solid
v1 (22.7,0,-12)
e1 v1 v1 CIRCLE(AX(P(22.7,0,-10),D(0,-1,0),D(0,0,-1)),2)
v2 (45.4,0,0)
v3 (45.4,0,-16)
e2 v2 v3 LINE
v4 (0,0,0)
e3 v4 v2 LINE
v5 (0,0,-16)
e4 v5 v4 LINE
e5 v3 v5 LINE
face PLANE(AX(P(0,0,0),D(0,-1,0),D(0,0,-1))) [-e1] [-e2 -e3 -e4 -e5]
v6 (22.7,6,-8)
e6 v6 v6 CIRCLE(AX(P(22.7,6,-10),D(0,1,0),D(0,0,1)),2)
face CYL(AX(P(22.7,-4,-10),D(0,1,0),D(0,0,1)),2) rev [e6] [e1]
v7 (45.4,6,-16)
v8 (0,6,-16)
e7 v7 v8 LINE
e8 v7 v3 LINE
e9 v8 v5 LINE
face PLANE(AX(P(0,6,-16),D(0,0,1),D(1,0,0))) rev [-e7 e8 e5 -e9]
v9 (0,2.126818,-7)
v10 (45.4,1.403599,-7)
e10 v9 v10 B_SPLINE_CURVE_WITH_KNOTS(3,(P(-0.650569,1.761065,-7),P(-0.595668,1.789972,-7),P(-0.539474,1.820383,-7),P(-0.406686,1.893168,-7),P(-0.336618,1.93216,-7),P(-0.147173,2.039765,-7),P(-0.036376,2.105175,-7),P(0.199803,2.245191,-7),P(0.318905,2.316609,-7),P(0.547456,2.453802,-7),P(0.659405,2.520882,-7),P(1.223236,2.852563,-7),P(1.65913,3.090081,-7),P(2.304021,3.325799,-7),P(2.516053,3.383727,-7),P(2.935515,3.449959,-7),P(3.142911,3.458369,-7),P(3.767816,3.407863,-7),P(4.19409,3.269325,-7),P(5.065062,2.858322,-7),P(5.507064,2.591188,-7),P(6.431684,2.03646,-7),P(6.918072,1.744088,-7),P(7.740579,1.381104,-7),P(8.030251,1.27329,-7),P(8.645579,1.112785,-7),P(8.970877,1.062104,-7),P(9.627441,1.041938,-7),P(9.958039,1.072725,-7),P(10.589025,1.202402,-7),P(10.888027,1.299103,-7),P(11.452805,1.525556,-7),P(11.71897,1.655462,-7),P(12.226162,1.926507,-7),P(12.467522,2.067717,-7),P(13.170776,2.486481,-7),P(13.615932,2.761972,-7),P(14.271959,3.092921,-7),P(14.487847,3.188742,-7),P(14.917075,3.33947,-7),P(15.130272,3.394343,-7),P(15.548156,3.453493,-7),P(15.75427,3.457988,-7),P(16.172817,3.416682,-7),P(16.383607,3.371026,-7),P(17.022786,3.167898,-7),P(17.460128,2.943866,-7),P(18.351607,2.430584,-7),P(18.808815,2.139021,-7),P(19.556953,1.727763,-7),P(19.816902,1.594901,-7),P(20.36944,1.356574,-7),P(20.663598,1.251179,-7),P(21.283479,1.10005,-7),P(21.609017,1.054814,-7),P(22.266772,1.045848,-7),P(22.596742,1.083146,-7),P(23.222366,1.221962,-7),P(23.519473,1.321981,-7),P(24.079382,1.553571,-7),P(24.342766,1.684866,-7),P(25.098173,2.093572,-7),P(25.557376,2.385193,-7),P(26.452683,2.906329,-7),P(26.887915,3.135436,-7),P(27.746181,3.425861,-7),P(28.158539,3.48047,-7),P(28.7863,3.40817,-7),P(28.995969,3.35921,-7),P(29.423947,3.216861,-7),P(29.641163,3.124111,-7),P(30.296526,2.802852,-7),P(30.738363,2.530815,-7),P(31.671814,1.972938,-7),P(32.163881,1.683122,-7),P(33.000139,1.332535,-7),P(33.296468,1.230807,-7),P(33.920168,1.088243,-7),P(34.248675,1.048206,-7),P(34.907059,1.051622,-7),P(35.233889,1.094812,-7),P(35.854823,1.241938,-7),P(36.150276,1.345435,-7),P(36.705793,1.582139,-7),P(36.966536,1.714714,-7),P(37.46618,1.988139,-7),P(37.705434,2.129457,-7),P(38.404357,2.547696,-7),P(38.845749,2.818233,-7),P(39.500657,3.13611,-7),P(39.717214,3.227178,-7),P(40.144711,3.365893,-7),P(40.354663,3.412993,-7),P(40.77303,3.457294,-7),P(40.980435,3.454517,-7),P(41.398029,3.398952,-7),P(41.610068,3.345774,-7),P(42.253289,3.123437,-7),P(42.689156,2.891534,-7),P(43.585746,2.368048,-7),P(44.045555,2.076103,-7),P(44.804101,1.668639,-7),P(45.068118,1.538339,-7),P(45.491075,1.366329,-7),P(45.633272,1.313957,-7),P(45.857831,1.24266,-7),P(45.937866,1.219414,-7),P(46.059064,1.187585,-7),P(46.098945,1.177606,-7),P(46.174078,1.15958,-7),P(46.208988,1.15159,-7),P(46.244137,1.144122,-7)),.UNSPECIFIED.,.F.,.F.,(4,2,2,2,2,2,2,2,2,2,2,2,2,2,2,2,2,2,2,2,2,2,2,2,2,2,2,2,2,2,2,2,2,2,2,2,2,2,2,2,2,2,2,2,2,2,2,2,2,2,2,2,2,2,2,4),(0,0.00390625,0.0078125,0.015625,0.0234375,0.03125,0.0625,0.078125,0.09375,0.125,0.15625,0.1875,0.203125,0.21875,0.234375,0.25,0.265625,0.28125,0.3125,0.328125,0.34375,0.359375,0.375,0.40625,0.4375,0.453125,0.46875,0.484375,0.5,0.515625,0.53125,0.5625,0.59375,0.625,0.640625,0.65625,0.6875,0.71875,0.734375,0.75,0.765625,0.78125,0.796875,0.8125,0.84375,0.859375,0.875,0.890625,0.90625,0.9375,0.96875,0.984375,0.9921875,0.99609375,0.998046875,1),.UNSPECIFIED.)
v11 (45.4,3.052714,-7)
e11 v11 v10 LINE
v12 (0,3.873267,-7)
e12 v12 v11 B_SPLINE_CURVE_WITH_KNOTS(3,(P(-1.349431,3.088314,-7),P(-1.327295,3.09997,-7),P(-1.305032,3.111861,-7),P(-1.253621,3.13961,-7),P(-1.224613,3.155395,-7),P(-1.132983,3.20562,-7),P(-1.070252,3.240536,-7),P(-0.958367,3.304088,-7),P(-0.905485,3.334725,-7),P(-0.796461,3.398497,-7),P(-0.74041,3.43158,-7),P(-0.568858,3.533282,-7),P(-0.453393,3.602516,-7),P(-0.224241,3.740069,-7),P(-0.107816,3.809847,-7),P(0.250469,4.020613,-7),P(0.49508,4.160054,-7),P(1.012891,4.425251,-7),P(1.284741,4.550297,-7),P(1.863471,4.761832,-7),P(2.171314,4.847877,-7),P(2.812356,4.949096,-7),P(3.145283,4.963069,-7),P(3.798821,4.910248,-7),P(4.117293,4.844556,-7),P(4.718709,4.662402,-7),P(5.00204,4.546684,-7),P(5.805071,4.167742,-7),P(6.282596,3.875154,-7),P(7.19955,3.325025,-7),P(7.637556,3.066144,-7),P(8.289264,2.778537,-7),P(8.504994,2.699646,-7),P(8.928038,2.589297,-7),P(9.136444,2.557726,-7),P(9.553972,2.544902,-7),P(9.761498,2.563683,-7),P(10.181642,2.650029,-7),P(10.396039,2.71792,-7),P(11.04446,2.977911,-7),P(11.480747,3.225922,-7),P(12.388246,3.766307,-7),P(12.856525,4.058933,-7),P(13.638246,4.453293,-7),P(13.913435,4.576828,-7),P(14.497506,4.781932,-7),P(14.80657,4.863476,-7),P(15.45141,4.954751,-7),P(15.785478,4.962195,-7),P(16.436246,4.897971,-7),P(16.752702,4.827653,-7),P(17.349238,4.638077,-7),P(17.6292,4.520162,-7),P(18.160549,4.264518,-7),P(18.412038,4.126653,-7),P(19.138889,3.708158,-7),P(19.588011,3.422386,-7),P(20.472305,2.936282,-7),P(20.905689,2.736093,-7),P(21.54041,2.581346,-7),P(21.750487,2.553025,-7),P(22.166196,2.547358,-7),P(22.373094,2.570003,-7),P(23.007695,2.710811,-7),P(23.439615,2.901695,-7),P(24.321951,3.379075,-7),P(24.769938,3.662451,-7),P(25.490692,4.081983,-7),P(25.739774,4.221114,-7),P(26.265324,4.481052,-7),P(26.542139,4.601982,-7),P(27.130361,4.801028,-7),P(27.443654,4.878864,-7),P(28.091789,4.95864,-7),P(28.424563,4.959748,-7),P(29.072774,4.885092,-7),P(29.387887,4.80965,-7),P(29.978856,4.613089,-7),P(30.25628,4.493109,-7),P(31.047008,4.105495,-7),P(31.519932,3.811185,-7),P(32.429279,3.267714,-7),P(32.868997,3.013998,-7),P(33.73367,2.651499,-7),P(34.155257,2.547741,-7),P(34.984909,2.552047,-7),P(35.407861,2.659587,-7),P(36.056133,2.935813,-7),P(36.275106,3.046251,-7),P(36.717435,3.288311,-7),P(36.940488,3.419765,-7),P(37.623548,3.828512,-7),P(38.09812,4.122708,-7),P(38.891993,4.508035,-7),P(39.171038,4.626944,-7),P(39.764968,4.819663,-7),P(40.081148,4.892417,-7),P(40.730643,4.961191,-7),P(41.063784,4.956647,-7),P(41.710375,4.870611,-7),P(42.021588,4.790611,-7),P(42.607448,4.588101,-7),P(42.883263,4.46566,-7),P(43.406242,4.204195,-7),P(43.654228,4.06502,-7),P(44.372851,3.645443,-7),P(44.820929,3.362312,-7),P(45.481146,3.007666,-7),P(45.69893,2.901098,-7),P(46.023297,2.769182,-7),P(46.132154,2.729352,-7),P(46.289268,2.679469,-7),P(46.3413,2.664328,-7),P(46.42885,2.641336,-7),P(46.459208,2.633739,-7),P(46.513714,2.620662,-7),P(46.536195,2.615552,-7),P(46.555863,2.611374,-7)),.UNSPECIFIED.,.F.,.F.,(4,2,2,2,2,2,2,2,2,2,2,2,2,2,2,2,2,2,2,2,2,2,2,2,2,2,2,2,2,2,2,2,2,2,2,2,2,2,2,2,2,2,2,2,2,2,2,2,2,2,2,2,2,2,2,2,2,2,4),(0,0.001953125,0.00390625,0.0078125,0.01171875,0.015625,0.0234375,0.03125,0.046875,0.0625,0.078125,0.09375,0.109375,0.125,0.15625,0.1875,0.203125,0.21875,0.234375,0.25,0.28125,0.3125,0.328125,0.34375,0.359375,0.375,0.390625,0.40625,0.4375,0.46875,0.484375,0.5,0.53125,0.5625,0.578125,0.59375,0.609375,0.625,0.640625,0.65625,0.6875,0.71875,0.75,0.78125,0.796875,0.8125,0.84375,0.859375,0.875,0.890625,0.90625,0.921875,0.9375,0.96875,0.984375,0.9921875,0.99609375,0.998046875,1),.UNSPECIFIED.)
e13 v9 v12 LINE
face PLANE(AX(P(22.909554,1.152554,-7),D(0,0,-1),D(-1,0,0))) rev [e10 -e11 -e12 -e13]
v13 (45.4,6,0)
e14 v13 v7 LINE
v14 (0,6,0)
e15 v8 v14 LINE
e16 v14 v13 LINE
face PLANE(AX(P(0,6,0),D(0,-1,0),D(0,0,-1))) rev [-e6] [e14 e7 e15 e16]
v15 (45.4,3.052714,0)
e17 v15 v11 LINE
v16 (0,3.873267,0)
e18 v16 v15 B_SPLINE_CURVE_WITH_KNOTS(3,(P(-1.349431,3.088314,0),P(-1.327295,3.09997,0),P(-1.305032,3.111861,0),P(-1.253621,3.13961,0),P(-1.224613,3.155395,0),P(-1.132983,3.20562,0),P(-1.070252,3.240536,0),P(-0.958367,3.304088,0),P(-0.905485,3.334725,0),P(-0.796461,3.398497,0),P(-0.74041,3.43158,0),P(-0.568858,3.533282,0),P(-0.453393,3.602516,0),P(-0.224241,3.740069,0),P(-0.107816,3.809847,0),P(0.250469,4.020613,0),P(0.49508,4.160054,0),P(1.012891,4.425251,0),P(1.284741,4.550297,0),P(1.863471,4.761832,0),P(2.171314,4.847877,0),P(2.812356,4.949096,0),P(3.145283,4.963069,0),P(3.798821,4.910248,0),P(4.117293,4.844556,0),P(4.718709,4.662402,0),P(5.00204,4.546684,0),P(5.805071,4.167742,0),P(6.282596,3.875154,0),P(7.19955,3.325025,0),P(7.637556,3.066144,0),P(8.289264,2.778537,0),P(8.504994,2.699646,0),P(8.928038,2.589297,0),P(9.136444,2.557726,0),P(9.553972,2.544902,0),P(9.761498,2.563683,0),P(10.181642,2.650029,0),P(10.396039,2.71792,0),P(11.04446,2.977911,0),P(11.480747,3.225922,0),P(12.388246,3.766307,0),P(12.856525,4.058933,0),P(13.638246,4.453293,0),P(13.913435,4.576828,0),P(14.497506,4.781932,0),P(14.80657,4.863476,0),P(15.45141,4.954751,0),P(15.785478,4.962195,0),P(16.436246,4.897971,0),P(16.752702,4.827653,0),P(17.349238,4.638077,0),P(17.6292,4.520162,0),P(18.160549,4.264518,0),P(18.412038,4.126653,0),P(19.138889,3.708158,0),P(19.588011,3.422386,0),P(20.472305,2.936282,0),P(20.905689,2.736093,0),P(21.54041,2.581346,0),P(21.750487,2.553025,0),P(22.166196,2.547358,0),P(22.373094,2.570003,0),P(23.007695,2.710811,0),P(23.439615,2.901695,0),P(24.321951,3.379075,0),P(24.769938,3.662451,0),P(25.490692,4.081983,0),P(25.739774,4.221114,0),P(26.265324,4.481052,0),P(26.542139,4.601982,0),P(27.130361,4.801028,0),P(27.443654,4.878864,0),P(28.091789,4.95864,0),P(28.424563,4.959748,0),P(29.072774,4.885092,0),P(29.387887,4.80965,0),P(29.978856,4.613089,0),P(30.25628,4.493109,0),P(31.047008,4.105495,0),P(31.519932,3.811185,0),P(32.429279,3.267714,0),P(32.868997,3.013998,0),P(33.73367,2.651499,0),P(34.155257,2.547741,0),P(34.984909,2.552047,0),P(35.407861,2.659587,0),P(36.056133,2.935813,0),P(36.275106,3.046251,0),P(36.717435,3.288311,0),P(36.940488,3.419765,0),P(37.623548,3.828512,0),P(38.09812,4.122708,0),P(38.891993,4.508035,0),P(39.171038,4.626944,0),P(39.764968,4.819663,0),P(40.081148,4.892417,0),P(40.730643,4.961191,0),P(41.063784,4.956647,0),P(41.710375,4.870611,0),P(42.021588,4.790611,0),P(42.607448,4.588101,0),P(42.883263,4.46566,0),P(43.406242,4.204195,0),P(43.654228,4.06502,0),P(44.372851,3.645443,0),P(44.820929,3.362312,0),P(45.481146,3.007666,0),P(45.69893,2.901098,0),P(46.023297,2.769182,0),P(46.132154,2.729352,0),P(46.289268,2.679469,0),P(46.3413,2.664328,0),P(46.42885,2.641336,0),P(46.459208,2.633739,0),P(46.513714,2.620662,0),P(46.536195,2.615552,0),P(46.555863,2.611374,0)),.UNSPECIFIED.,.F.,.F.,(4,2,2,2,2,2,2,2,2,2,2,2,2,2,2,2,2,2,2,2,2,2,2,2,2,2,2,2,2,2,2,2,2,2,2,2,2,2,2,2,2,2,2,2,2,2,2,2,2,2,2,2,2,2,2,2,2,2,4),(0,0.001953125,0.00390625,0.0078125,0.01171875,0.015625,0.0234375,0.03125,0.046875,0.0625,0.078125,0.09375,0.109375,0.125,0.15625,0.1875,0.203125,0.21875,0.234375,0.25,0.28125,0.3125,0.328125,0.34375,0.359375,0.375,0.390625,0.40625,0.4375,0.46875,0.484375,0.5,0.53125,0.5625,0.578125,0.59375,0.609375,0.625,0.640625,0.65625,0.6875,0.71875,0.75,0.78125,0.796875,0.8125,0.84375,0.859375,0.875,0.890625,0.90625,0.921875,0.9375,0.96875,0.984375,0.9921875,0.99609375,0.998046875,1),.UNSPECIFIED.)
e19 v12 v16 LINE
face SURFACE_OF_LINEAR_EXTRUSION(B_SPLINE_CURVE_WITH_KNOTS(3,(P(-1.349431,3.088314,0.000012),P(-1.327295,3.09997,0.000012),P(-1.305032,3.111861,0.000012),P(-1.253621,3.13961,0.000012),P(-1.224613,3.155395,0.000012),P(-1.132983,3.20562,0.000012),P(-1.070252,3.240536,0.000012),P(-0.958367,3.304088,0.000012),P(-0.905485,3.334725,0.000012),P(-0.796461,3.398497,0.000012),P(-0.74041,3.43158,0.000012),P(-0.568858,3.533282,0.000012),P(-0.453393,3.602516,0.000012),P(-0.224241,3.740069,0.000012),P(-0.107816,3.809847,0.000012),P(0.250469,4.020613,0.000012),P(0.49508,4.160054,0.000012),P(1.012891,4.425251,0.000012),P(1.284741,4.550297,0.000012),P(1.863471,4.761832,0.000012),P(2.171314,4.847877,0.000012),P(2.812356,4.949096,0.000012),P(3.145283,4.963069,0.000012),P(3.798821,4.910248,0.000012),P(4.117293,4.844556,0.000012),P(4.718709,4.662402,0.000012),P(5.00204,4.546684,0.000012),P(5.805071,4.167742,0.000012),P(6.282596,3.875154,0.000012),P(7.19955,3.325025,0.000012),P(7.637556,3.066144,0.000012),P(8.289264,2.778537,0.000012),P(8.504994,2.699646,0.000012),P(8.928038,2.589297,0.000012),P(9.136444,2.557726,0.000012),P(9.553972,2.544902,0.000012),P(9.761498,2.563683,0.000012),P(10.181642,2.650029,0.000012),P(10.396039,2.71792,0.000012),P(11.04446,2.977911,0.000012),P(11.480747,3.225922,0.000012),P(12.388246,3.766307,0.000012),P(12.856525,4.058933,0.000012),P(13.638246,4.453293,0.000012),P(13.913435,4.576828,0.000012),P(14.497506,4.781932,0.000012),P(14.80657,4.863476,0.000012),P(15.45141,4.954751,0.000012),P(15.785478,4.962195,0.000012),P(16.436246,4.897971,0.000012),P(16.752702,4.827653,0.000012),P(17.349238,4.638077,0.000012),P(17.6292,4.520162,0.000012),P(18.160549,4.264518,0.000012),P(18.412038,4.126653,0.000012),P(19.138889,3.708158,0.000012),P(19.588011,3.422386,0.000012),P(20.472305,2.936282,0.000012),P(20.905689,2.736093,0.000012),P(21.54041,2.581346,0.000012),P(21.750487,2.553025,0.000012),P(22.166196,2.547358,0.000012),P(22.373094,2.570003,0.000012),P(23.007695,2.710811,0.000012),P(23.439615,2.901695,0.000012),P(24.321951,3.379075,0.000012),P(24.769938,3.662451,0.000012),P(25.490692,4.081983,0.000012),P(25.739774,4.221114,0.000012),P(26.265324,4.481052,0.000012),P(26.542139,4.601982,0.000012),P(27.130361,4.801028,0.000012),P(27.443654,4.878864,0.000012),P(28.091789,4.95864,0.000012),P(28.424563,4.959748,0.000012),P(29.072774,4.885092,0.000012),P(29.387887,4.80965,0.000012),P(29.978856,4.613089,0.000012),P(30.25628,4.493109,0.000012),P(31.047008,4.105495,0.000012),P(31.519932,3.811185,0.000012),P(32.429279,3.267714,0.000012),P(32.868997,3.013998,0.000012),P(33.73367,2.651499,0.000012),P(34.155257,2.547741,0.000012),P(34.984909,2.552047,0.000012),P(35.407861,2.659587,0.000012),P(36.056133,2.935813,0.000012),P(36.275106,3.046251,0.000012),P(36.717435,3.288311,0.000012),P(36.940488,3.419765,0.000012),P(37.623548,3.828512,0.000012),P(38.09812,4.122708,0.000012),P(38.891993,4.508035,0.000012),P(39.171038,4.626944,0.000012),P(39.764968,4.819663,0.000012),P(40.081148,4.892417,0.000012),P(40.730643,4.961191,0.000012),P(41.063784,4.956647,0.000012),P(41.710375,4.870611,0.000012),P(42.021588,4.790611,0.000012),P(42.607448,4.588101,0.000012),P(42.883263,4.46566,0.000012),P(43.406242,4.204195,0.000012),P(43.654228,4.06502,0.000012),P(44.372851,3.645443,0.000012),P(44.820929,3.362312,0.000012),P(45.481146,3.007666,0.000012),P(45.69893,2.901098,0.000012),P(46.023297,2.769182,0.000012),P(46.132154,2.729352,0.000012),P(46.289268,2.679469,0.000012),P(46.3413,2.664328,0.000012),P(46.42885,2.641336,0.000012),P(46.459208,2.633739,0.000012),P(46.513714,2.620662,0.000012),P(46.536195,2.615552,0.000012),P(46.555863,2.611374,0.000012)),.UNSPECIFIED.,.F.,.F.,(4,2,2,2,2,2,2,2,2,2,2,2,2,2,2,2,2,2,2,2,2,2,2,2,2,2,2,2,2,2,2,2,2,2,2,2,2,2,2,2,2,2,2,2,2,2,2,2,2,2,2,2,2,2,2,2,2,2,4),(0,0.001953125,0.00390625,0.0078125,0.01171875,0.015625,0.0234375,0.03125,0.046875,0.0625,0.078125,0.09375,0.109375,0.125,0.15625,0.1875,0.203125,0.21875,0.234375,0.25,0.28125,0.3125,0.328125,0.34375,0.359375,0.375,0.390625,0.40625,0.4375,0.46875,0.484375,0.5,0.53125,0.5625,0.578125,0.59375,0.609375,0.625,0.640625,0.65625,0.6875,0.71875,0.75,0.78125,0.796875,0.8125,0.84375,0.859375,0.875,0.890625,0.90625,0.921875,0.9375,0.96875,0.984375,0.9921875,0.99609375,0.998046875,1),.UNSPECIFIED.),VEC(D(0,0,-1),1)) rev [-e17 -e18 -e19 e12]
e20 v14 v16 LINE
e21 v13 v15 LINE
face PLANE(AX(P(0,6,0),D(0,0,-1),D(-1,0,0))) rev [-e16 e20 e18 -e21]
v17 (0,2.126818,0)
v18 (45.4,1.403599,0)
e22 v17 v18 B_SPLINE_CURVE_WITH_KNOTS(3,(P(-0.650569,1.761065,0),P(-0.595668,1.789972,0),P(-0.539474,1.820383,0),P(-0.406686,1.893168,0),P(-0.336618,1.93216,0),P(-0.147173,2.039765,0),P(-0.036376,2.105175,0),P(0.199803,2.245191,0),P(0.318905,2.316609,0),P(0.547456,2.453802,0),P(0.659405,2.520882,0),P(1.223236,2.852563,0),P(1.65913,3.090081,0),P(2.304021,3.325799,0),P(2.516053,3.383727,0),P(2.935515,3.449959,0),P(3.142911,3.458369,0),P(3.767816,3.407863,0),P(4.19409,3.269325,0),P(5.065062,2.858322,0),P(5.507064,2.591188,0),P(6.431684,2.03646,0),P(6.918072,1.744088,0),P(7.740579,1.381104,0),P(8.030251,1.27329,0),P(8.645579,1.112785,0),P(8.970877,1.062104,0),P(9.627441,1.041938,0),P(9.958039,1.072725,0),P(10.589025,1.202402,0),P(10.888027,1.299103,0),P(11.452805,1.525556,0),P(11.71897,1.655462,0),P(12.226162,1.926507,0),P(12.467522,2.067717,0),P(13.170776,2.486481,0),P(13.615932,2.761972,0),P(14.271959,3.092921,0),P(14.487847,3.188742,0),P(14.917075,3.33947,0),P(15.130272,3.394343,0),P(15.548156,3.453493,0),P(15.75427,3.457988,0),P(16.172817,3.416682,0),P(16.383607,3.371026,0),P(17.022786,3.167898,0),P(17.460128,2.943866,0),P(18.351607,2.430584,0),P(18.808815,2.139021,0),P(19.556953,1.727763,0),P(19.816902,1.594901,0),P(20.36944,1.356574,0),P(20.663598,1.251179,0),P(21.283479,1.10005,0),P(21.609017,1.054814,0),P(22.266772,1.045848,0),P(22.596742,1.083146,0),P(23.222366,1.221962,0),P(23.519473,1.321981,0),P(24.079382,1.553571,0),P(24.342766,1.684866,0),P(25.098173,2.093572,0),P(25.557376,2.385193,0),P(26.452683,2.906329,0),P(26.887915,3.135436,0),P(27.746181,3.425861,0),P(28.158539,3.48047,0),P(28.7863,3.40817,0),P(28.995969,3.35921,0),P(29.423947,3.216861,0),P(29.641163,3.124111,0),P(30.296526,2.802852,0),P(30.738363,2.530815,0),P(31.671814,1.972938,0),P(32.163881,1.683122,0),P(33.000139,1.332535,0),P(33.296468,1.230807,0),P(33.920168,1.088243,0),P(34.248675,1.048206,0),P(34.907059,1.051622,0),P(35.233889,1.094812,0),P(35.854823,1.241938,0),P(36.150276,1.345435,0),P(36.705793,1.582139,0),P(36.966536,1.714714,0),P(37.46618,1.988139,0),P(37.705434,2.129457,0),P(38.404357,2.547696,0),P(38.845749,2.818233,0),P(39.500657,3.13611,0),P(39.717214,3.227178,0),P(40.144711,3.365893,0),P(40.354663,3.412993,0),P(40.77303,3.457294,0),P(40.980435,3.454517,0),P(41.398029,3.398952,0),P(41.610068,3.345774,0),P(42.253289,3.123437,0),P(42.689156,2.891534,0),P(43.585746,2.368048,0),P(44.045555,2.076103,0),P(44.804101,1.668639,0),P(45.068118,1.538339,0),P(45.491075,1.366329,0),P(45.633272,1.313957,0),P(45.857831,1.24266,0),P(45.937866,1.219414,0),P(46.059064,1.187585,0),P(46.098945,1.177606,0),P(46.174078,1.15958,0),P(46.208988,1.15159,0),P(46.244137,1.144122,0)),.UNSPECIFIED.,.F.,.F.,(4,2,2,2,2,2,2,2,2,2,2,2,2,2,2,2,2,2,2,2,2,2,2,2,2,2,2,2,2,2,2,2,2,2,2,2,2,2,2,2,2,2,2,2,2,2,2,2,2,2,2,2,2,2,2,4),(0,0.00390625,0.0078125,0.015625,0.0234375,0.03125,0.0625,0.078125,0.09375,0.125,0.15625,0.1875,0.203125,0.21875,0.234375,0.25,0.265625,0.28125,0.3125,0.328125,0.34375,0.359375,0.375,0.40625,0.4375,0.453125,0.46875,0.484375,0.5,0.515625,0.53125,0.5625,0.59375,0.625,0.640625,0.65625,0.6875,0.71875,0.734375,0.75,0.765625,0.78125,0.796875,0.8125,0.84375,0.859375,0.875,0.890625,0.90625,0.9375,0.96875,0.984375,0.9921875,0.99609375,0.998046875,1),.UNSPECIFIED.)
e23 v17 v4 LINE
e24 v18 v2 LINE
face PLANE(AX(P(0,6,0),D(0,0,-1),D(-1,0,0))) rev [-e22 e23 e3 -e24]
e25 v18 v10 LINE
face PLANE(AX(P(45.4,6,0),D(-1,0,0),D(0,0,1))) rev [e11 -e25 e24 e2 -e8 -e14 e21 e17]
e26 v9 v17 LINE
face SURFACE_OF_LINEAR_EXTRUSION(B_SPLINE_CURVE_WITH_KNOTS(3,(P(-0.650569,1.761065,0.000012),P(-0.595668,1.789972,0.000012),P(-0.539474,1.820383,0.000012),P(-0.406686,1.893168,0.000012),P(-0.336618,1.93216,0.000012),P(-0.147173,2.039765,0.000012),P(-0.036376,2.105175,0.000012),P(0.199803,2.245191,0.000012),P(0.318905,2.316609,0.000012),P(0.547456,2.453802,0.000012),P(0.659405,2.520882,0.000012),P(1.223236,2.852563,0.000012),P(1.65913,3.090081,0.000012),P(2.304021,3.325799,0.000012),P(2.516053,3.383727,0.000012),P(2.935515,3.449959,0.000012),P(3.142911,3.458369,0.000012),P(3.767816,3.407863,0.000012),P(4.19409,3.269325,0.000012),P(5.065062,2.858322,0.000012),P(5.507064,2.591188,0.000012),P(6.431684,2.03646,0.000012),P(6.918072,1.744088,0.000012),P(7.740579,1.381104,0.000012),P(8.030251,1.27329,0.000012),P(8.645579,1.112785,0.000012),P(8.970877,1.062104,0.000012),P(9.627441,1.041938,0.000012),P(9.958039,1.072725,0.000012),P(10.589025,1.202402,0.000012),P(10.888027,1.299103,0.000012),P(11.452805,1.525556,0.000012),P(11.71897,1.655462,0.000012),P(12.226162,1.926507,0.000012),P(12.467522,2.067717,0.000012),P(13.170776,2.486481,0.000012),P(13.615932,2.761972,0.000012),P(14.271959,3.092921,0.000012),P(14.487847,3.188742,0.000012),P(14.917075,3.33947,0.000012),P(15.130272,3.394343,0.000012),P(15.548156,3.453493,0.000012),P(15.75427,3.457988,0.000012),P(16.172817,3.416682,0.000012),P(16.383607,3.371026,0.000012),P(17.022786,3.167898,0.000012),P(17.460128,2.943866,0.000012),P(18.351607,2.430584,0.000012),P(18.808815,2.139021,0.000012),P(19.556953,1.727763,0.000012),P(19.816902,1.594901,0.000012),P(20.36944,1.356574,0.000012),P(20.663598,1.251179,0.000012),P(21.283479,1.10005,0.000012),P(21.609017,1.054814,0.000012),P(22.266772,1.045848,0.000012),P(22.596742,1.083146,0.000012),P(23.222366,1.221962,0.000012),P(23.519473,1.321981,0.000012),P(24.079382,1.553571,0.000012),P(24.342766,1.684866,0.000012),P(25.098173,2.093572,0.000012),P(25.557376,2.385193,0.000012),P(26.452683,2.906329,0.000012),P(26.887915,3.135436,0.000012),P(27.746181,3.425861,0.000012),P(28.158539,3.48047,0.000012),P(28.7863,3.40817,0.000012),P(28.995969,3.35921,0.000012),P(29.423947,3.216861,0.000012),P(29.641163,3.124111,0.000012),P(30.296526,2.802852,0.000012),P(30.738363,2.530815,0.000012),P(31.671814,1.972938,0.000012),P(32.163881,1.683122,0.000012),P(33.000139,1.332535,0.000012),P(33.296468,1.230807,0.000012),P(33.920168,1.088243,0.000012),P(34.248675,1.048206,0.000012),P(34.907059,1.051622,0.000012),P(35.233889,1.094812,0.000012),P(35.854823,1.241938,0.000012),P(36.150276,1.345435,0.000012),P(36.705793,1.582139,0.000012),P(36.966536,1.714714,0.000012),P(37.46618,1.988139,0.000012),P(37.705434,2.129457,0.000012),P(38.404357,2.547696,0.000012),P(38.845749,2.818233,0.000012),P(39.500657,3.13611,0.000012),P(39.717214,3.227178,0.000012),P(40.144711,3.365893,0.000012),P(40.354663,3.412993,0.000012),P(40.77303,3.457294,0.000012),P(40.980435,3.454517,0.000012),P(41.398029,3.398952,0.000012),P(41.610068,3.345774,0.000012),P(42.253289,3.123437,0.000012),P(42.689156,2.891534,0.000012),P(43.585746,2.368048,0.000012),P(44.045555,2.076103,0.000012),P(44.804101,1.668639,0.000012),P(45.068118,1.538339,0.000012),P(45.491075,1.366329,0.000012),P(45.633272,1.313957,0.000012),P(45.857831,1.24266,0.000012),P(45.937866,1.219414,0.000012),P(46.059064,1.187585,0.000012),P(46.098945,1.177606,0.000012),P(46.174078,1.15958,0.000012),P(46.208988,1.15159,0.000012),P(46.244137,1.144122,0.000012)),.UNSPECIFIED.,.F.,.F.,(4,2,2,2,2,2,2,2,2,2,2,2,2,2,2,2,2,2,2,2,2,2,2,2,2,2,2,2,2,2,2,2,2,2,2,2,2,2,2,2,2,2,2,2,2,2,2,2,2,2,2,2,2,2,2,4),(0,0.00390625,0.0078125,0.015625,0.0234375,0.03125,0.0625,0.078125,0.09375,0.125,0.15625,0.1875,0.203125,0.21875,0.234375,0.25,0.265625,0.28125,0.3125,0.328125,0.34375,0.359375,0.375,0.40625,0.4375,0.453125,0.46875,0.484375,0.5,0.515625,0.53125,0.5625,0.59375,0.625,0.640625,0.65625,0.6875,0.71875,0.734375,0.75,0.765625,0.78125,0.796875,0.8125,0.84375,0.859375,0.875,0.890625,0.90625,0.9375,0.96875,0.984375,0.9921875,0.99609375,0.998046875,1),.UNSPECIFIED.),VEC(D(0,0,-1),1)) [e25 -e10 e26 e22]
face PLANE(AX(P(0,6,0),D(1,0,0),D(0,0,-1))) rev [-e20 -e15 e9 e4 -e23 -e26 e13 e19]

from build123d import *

# Parameters (mm, degrees)
SKETCH1_W               = 45.4
SKETCH1_H               = 16
BOSS_EXTRUDE1_DEPTH     = 6
CUT_EXTRUDE_THIN1_START = -7
CUT_EXTRUDE_THIN1_DEPTH = 7
SKETCH3_R               = 2
CUT_EXTRUDE4_DEPTH      = 10


# Read off the part's stored shape, not the designer's step: Cut-Extrude-Thin1
with BuildPart() as part:
    # Sketch1 → Boss-Extrude1 (new body)
    with BuildSketch(Plane(origin=(0, 0, 0), x_dir=(1, 0, 0), z_dir=(0, 1, 0))):
        with Locations((22.7, 8)):
            Rectangle(SKETCH1_W, SKETCH1_H)
    extrude(amount=BOSS_EXTRUDE1_DEPTH)

    # Cut-Extrude-Thin1 outline → Cut-Extrude-Thin1 (cut)
    with BuildSketch(Plane.XY.offset(CUT_EXTRUDE_THIN1_START)):
        with BuildLine():
            Line((0, 3.873267445), (0, 2.126817741))
            add(Edge.make_bspline(
                [(0, 2.126817741), (0.02703382, 2.142781723), (0.054175194, 2.15885723), (0.199802786, 2.245191001), (0.318904635, 2.316609427), (0.547456156, 2.453801634), (0.659404505, 2.520881504), (1.223235747, 2.852563391), (1.659129881, 3.090081368), (2.304021331, 3.325798968), (2.516053427, 3.383726921), (2.935514936, 3.449959162), (3.142910642, 3.458369463), (3.767815623, 3.407863189), (4.19408996, 3.269324885), (5.065062464, 2.858321616), (5.50706417, 2.591187682), (6.431683782, 2.036459554), (6.918071796, 1.744087969), (7.740579172, 1.381104099), (8.030251466, 1.273290225), (8.645579036, 1.112784531), (8.970876862, 1.062103691), (9.62744136, 1.04193798), (9.958039149, 1.072725046), (10.589024972, 1.202402245), (10.888026805, 1.299103066), (11.452805261, 1.525556109), (11.718970495, 1.655461765), (12.226161625, 1.926507336), (12.467522401, 2.067716558), (13.170775959, 2.486480844), (13.615931783, 2.76197178), (14.271958768, 3.092921072), (14.487846746, 3.188741776), (14.917075207, 3.339470443), (15.130272064, 3.394343156), (15.548156295, 3.45349324), (15.75427037, 3.457987949), (16.172816849, 3.416681909), (16.383607329, 3.371026255), (17.022785721, 3.167898464), (17.460128234, 2.943866168), (18.351607435, 2.430583519), (18.80881458, 2.139021166), (19.556952632, 1.727762653), (19.816902465, 1.594900544), (20.369439987, 1.356573587), (20.663597747, 1.251179423), (21.283479066, 1.10005025), (21.609016745, 1.054814487), (22.266771634, 1.045847552), (22.596742032, 1.083145554), (23.222365778, 1.221962497), (23.519472543, 1.321980696), (24.079382347, 1.553570863), (24.342766312, 1.684865845), (25.098173394, 2.093571519), (25.557376229, 2.385193139), (26.452683258, 2.906328822), (26.887914853, 3.135436001), (27.746180841, 3.425860973), (28.158539125, 3.480470405), (28.786299796, 3.408170386), (28.995968884, 3.359210465), (29.423947166, 3.216861002), (29.641162564, 3.124110993), (30.296525986, 2.802852497), (30.738363236, 2.530814809), (31.671813969, 1.97293848), (32.163881244, 1.683121755), (33.000138587, 1.332534814), (33.296467876, 1.230806571), (33.92016789, 1.088242868), (34.248675292, 1.048205652), (34.907059265, 1.051622384), (35.233888776, 1.094812192), (35.854823483, 1.241938496), (36.150275582, 1.345434697), (36.705793014, 1.582138569), (36.966535771, 1.714713739), (37.46618007, 1.988138513), (37.705434355, 2.129457341), (38.404356673, 2.547696158), (38.845749072, 2.818233186), (39.500657349, 3.136109655), (39.717214125, 3.227177696), (40.144711185, 3.365892553), (40.354662828, 3.412992927), (40.773030437, 3.457293529), (40.980435207, 3.454517198), (41.398028958, 3.398951825), (41.610067714, 3.345773528), (42.253288523, 3.123436571), (42.689155986, 2.891534001), (43.585746337, 2.368048308), (44.045555086, 2.076103322), (44.804100753, 1.668638949), (45.068118248, 1.538339158), (45.366705882, 1.416907758), (45.383339369, 1.410218973), (45.4, 1.403598957)],
                knots=[0.01380316, 0.01380316, 0.01380316, 0.01380316, 0.015625, 0.015625, 0.0234375, 0.0234375, 0.03125, 0.03125, 0.0625, 0.0625, 0.078125, 0.078125, 0.09375, 0.09375, 0.125, 0.125, 0.15625, 0.15625, 0.1875, 0.1875, 0.203125, 0.203125, 0.21875, 0.21875, 0.234375, 0.234375, 0.25, 0.25, 0.265625, 0.265625, 0.28125, 0.28125, 0.3125, 0.3125, 0.328125, 0.328125, 0.34375, 0.34375, 0.359375, 0.359375, 0.375, 0.375, 0.40625, 0.40625, 0.4375, 0.4375, 0.453125, 0.453125, 0.46875, 0.46875, 0.484375, 0.484375, 0.5, 0.5, 0.515625, 0.515625, 0.53125, 0.53125, 0.5625, 0.5625, 0.59375, 0.59375, 0.625, 0.625, 0.640625, 0.640625, 0.65625, 0.65625, 0.6875, 0.6875, 0.71875, 0.71875, 0.734375, 0.734375, 0.75, 0.75, 0.765625, 0.765625, 0.78125, 0.78125, 0.796875, 0.796875, 0.8125, 0.8125, 0.84375, 0.84375, 0.859375, 0.859375, 0.875, 0.875, 0.890625, 0.890625, 0.90625, 0.90625, 0.9375, 0.9375, 0.96875, 0.96875, 0.984375, 0.984375, 0.985295787, 0.985295787, 0.985295787, 0.985295787], degree=3))
            Line((45.4, 1.403598957), (45.400000004, 3.052714))
            add(Edge.make_bspline(
                [(0, 3.873267445), (0.003867713, 3.875545356), (0.007738546, 3.877823787), (0.250469006, 4.020613492), (0.495079597, 4.160053663), (1.012890651, 4.425250629), (1.284740564, 4.550297134), (1.86347111, 4.76183192), (2.171314028, 4.847876947), (2.81235644, 4.949096426), (3.145282675, 4.963068961), (3.798820837, 4.910248487), (4.117293225, 4.844555634), (4.718708859, 4.662401706), (5.002040385, 4.546684188), (5.805070872, 4.167742082), (6.282596051, 3.875154302), (7.19954989, 3.325025275), (7.637556428, 3.066144173), (8.289263977, 2.778536627), (8.504994239, 2.69964625), (8.928037725, 2.589297078), (9.136444307, 2.5577258), (9.553972433, 2.544901849), (9.761498066, 2.56368264), (10.181642273, 2.650028675), (10.396038802, 2.717920292), (11.044459748, 2.97791055), (11.480747342, 3.225921565), (12.388245941, 3.766307033), (12.856524649, 4.058933488), (13.638246286, 4.453292605), (13.913435199, 4.576828438), (14.497506198, 4.7819319), (14.80657005, 4.863476297), (15.451409614, 4.954751133), (15.785477854, 4.962195082), (16.436245788, 4.89797128), (16.752702226, 4.827653432), (17.349238381, 4.638077136), (17.629199854, 4.520162486), (18.160549165, 4.264517545), (18.412038425, 4.126652649), (19.138888817, 3.708157529), (19.588011382, 3.422386166), (20.472304829, 2.936281753), (20.905689258, 2.736093288), (21.540410043, 2.581346203), (21.750486993, 2.553025254), (22.166195505, 2.54735805), (22.37309431, 2.570002638), (23.007695036, 2.710811445), (23.43961466, 2.901695121), (24.321951208, 3.379074751), (24.769938492, 3.662450532), (25.49069199, 4.081982999), (25.739774147, 4.221113848), (26.265324427, 4.481051988), (26.542139405, 4.601982239), (27.130361027, 4.801028048), (27.443653593, 4.878863839), (28.09178915, 4.958640067), (28.424563097, 4.959747626), (29.072774338, 4.885092288), (29.387887281, 4.80965047), (29.978856326, 4.6130888), (30.256280206, 4.493108966), (31.047007705, 4.105495135), (31.519931981, 3.811184839), (32.42927946, 3.267713808), (32.86899683, 3.013998451), (33.733669543, 2.651498841), (34.155257129, 2.54774105), (34.984908919, 2.552046589), (35.407860618, 2.659586891), (36.056133151, 2.93581336), (36.27510638, 3.046251422), (36.71743538, 3.288311037), (36.940487753, 3.419765313), (37.623548397, 3.828512419), (38.098120254, 4.122708489), (38.891992645, 4.508034742), (39.171037756, 4.62694392), (39.764967834, 4.8196632), (40.081148481, 4.892416665), (40.730643342, 4.961191141), (41.063783913, 4.956647377), (41.710375198, 4.870611401), (42.021587579, 4.790610545), (42.607447829, 4.58810095), (42.883262745, 4.465659864), (43.406242203, 4.204194984), (43.654228228, 4.065020041), (44.372851449, 3.645442724), (44.820928505, 3.362312101), (45.307481866, 3.100952543), (45.353788309, 3.07654159), (45.400000004, 3.052714)],
                knots=[0.030996579, 0.030996579, 0.030996579, 0.030996579, 0.03125, 0.03125, 0.046875, 0.046875, 0.0625, 0.0625, 0.078125, 0.078125, 0.09375, 0.09375, 0.109375, 0.109375, 0.125, 0.125, 0.15625, 0.15625, 0.1875, 0.1875, 0.203125, 0.203125, 0.21875, 0.21875, 0.234375, 0.234375, 0.25, 0.25, 0.28125, 0.28125, 0.3125, 0.3125, 0.328125, 0.328125, 0.34375, 0.34375, 0.359375, 0.359375, 0.375, 0.375, 0.390625, 0.390625, 0.40625, 0.40625, 0.4375, 0.4375, 0.46875, 0.46875, 0.484375, 0.484375, 0.5, 0.5, 0.53125, 0.53125, 0.5625, 0.5625, 0.578125, 0.578125, 0.59375, 0.59375, 0.609375, 0.609375, 0.625, 0.625, 0.640625, 0.640625, 0.65625, 0.65625, 0.6875, 0.6875, 0.71875, 0.71875, 0.75, 0.75, 0.78125, 0.78125, 0.796875, 0.796875, 0.8125, 0.8125, 0.84375, 0.84375, 0.859375, 0.859375, 0.875, 0.875, 0.890625, 0.890625, 0.90625, 0.90625, 0.921875, 0.921875, 0.9375, 0.9375, 0.96875, 0.96875, 0.972044951, 0.972044951, 0.972044951, 0.972044951], degree=3))
        make_face()
    extrude(amount=CUT_EXTRUDE_THIN1_DEPTH, mode=Mode.SUBTRACT)

    # Sketch3 → Cut-Extrude4 (cut)
    with BuildSketch(Plane(origin=(0, 6, 0), x_dir=(1, 0, 0), z_dir=(0, 1, 0))):
        with Locations(Location((22.7, 10, 0), (0, 0, 270))):
            Circle(SKETCH3_R)
    extrude(amount=-CUT_EXTRUDE4_DEPTH, mode=Mode.SUBTRACT)


solid = part.part
